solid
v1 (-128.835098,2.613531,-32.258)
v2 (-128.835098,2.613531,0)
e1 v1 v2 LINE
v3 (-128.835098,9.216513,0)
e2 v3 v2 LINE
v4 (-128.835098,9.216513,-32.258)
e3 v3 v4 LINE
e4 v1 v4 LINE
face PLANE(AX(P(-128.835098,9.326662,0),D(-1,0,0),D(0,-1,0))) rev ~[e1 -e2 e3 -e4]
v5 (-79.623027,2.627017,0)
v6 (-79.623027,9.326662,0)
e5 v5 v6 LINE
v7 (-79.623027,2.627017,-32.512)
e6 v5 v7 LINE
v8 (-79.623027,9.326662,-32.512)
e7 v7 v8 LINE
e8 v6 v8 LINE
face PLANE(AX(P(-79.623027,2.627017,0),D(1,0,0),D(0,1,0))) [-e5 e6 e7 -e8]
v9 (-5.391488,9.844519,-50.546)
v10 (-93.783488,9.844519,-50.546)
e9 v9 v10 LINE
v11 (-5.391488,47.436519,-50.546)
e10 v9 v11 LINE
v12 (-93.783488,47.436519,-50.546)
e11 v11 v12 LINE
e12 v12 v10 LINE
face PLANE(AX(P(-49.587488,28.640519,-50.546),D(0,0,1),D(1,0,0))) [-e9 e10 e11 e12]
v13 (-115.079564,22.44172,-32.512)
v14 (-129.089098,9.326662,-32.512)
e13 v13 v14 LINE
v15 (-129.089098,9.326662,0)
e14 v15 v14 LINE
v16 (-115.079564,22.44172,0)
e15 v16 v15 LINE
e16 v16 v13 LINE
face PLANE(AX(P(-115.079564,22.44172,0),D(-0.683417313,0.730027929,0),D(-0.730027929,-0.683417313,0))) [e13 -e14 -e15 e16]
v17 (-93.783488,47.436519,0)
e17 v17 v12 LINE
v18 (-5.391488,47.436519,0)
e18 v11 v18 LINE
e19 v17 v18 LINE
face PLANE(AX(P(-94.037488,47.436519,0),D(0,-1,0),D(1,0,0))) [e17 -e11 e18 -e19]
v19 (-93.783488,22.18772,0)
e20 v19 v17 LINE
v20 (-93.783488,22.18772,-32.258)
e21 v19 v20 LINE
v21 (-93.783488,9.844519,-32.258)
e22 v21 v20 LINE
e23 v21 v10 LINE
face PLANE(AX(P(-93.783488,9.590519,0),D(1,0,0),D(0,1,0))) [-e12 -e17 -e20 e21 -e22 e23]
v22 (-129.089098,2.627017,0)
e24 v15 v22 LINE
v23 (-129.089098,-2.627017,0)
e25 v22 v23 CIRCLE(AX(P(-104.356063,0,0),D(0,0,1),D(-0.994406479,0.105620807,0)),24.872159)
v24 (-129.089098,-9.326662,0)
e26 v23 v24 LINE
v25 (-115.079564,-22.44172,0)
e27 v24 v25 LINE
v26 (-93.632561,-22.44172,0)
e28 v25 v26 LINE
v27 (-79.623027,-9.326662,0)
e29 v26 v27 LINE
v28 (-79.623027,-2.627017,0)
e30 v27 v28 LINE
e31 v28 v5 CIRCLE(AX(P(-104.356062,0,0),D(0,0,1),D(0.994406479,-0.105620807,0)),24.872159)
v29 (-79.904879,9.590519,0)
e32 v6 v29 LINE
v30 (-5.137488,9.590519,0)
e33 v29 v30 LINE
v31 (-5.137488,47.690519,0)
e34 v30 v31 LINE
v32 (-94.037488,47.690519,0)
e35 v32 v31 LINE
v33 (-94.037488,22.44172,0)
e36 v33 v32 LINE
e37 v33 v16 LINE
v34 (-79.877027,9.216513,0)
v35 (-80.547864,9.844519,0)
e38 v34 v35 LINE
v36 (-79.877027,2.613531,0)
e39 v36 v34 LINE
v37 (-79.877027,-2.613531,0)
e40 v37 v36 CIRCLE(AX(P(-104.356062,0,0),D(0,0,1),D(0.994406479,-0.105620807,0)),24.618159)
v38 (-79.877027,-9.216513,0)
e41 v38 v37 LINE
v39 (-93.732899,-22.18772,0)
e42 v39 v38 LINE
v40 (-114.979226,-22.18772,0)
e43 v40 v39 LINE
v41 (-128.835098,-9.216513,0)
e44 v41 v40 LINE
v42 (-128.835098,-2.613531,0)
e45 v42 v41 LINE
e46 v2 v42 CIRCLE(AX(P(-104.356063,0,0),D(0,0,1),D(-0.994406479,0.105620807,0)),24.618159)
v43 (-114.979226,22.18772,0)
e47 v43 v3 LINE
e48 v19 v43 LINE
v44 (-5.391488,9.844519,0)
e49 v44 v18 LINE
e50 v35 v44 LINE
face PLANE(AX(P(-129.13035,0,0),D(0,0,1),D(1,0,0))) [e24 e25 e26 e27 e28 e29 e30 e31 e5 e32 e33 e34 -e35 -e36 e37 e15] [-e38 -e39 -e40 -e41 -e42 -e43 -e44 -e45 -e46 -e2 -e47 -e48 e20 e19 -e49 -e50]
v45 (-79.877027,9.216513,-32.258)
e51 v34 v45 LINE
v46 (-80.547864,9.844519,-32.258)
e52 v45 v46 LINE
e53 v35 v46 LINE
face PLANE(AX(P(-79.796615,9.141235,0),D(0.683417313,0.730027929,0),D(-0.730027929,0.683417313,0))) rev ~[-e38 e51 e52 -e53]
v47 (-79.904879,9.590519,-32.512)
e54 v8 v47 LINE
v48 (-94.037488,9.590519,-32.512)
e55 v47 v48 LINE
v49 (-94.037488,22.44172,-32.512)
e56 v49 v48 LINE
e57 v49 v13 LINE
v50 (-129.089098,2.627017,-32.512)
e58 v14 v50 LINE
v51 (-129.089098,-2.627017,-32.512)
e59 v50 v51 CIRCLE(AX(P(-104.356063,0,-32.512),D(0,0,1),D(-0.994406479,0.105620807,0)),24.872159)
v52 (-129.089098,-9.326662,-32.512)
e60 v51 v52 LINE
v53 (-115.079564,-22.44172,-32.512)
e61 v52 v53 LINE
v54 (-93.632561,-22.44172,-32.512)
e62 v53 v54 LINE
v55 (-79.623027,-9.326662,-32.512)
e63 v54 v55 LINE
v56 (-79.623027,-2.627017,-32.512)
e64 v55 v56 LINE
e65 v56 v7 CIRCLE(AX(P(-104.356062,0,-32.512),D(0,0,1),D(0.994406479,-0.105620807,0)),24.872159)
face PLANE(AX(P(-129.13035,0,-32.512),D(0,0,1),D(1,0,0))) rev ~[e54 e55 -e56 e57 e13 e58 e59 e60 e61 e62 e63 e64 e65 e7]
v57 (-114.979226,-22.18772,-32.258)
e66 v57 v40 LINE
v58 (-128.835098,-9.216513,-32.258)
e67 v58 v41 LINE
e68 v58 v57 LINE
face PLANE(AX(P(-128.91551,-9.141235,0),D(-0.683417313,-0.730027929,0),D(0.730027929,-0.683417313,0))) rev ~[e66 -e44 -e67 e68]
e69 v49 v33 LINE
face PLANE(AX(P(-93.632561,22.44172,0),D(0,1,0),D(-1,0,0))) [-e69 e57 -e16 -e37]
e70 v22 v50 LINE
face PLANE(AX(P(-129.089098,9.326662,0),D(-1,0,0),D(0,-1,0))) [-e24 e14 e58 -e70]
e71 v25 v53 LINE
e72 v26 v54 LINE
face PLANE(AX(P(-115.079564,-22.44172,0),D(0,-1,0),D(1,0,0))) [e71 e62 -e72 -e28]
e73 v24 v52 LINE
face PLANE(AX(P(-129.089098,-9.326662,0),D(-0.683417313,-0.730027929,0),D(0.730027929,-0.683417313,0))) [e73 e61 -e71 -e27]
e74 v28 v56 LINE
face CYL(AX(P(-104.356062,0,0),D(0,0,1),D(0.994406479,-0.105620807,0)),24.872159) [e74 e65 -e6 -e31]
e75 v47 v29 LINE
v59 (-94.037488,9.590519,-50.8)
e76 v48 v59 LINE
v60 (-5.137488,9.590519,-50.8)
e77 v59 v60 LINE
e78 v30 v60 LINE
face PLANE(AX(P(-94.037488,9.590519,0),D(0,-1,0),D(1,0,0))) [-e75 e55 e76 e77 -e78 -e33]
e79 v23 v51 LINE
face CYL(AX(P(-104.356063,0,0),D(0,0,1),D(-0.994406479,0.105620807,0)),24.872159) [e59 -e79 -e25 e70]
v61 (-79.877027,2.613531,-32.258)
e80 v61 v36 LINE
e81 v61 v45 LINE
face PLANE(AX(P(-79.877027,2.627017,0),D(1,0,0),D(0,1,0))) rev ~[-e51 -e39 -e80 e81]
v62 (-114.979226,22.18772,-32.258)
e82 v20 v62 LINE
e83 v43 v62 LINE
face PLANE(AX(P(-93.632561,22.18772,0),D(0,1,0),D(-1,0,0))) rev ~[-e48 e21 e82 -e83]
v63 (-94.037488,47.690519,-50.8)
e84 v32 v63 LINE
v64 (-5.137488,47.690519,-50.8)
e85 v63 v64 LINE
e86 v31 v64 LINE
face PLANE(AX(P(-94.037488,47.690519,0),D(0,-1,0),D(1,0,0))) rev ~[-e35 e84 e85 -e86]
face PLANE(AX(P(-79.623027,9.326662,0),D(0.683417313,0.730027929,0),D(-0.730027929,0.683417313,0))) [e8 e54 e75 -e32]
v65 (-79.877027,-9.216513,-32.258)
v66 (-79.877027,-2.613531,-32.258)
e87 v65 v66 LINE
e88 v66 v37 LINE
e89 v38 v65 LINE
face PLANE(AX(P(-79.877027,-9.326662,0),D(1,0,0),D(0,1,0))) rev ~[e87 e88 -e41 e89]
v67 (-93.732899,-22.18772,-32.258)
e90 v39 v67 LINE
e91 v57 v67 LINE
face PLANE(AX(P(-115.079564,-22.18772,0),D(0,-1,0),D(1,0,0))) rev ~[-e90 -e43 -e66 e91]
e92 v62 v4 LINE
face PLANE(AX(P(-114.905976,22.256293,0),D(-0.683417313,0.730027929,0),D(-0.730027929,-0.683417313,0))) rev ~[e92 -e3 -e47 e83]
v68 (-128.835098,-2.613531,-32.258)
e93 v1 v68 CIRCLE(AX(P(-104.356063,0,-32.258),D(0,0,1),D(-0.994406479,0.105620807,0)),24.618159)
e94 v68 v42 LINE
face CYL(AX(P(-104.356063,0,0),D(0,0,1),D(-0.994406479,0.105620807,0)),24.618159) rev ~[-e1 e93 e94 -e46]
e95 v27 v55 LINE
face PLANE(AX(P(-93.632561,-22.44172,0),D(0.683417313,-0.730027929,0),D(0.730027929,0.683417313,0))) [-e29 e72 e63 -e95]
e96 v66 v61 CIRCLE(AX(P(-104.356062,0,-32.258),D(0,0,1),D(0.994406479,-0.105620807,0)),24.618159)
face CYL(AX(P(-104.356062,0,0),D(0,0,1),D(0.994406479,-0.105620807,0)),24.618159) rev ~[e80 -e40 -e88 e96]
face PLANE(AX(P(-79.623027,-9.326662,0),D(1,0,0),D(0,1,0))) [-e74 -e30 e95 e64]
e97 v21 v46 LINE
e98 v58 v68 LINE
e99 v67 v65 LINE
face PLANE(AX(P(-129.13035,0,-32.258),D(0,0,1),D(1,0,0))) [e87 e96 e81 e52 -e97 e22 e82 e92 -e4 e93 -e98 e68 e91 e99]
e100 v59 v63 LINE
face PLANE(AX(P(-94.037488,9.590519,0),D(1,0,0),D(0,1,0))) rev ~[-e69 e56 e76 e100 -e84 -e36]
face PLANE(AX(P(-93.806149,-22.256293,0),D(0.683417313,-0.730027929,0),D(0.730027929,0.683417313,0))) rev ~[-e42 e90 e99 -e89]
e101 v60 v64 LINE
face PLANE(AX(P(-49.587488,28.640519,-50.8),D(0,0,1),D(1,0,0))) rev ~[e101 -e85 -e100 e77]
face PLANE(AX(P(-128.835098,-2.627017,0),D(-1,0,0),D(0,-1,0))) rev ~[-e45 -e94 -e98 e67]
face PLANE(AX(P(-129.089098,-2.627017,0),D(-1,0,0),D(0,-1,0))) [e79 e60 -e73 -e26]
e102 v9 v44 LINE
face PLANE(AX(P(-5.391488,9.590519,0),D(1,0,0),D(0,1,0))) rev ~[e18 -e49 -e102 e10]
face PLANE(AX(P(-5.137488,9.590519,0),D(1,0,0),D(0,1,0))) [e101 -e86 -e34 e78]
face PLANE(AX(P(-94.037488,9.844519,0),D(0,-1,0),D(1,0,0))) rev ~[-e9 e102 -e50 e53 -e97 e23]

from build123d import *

# Parameters (mm, degrees)
F1_W     = 88.9
F1_H     = 38.1
F2_DEPTH = 50.8
F3_DEPTH = 32.512
F4_T     = -0.254


with BuildPart() as f2:
    # F1 (on Top) → F2 (new body)
    with BuildSketch(Plane.XY):
        with Locations((-49.5874881029, 28.6405186608)):
            Rectangle(F1_W, F1_H)
    extrude(amount=-F2_DEPTH)

    # F0 (on Top) → F3 (join)
    with BuildSketch(Plane.XY):
        with BuildLine():
            Line((-129.0890981385, -2.6270174623), (-129.0890981385, 2.6270174623))
            ThreePointArc((-129.0890981385, 2.6270174623), (-129.2282210844, 0), (-129.0890981385, -2.6270174623))
        make_face()
        Polygon((-129.0890981385, 9.3266623309), (-129.0890981385, 2.6270174623), (-129.0890981385, -2.6270174623), (-129.0890981385, -9.3266623309), (-115.0795637781, -22.4417199168), (-93.6325612334, -22.4417199168), (-79.623026873, -9.3266623309), (-79.623026873, -2.6270174623), (-79.623026873, 2.6270174623), (-79.623026873, 9.3266623309), (-93.6325612334, 22.4417199168), (-115.0795637781, 22.4417199168), align=None)
        with BuildLine():
            ThreePointArc((-79.623026873, -2.6270174623), (-79.4839039271, 0), (-79.623026873, 2.6270174623))
            Line((-79.623026873, 2.6270174623), (-79.623026873, -2.6270174623))
        make_face()
    extrude(amount=-F3_DEPTH)

    # F4
    f4_openings = [f2.faces().sort_by_distance(p)[0] for p in [
        (-68.590003, 18.592115, 0),
    ]]
    offset(amount=F4_T, openings=f4_openings, kind=Kind.INTERSECTION)


solid = f2.part
